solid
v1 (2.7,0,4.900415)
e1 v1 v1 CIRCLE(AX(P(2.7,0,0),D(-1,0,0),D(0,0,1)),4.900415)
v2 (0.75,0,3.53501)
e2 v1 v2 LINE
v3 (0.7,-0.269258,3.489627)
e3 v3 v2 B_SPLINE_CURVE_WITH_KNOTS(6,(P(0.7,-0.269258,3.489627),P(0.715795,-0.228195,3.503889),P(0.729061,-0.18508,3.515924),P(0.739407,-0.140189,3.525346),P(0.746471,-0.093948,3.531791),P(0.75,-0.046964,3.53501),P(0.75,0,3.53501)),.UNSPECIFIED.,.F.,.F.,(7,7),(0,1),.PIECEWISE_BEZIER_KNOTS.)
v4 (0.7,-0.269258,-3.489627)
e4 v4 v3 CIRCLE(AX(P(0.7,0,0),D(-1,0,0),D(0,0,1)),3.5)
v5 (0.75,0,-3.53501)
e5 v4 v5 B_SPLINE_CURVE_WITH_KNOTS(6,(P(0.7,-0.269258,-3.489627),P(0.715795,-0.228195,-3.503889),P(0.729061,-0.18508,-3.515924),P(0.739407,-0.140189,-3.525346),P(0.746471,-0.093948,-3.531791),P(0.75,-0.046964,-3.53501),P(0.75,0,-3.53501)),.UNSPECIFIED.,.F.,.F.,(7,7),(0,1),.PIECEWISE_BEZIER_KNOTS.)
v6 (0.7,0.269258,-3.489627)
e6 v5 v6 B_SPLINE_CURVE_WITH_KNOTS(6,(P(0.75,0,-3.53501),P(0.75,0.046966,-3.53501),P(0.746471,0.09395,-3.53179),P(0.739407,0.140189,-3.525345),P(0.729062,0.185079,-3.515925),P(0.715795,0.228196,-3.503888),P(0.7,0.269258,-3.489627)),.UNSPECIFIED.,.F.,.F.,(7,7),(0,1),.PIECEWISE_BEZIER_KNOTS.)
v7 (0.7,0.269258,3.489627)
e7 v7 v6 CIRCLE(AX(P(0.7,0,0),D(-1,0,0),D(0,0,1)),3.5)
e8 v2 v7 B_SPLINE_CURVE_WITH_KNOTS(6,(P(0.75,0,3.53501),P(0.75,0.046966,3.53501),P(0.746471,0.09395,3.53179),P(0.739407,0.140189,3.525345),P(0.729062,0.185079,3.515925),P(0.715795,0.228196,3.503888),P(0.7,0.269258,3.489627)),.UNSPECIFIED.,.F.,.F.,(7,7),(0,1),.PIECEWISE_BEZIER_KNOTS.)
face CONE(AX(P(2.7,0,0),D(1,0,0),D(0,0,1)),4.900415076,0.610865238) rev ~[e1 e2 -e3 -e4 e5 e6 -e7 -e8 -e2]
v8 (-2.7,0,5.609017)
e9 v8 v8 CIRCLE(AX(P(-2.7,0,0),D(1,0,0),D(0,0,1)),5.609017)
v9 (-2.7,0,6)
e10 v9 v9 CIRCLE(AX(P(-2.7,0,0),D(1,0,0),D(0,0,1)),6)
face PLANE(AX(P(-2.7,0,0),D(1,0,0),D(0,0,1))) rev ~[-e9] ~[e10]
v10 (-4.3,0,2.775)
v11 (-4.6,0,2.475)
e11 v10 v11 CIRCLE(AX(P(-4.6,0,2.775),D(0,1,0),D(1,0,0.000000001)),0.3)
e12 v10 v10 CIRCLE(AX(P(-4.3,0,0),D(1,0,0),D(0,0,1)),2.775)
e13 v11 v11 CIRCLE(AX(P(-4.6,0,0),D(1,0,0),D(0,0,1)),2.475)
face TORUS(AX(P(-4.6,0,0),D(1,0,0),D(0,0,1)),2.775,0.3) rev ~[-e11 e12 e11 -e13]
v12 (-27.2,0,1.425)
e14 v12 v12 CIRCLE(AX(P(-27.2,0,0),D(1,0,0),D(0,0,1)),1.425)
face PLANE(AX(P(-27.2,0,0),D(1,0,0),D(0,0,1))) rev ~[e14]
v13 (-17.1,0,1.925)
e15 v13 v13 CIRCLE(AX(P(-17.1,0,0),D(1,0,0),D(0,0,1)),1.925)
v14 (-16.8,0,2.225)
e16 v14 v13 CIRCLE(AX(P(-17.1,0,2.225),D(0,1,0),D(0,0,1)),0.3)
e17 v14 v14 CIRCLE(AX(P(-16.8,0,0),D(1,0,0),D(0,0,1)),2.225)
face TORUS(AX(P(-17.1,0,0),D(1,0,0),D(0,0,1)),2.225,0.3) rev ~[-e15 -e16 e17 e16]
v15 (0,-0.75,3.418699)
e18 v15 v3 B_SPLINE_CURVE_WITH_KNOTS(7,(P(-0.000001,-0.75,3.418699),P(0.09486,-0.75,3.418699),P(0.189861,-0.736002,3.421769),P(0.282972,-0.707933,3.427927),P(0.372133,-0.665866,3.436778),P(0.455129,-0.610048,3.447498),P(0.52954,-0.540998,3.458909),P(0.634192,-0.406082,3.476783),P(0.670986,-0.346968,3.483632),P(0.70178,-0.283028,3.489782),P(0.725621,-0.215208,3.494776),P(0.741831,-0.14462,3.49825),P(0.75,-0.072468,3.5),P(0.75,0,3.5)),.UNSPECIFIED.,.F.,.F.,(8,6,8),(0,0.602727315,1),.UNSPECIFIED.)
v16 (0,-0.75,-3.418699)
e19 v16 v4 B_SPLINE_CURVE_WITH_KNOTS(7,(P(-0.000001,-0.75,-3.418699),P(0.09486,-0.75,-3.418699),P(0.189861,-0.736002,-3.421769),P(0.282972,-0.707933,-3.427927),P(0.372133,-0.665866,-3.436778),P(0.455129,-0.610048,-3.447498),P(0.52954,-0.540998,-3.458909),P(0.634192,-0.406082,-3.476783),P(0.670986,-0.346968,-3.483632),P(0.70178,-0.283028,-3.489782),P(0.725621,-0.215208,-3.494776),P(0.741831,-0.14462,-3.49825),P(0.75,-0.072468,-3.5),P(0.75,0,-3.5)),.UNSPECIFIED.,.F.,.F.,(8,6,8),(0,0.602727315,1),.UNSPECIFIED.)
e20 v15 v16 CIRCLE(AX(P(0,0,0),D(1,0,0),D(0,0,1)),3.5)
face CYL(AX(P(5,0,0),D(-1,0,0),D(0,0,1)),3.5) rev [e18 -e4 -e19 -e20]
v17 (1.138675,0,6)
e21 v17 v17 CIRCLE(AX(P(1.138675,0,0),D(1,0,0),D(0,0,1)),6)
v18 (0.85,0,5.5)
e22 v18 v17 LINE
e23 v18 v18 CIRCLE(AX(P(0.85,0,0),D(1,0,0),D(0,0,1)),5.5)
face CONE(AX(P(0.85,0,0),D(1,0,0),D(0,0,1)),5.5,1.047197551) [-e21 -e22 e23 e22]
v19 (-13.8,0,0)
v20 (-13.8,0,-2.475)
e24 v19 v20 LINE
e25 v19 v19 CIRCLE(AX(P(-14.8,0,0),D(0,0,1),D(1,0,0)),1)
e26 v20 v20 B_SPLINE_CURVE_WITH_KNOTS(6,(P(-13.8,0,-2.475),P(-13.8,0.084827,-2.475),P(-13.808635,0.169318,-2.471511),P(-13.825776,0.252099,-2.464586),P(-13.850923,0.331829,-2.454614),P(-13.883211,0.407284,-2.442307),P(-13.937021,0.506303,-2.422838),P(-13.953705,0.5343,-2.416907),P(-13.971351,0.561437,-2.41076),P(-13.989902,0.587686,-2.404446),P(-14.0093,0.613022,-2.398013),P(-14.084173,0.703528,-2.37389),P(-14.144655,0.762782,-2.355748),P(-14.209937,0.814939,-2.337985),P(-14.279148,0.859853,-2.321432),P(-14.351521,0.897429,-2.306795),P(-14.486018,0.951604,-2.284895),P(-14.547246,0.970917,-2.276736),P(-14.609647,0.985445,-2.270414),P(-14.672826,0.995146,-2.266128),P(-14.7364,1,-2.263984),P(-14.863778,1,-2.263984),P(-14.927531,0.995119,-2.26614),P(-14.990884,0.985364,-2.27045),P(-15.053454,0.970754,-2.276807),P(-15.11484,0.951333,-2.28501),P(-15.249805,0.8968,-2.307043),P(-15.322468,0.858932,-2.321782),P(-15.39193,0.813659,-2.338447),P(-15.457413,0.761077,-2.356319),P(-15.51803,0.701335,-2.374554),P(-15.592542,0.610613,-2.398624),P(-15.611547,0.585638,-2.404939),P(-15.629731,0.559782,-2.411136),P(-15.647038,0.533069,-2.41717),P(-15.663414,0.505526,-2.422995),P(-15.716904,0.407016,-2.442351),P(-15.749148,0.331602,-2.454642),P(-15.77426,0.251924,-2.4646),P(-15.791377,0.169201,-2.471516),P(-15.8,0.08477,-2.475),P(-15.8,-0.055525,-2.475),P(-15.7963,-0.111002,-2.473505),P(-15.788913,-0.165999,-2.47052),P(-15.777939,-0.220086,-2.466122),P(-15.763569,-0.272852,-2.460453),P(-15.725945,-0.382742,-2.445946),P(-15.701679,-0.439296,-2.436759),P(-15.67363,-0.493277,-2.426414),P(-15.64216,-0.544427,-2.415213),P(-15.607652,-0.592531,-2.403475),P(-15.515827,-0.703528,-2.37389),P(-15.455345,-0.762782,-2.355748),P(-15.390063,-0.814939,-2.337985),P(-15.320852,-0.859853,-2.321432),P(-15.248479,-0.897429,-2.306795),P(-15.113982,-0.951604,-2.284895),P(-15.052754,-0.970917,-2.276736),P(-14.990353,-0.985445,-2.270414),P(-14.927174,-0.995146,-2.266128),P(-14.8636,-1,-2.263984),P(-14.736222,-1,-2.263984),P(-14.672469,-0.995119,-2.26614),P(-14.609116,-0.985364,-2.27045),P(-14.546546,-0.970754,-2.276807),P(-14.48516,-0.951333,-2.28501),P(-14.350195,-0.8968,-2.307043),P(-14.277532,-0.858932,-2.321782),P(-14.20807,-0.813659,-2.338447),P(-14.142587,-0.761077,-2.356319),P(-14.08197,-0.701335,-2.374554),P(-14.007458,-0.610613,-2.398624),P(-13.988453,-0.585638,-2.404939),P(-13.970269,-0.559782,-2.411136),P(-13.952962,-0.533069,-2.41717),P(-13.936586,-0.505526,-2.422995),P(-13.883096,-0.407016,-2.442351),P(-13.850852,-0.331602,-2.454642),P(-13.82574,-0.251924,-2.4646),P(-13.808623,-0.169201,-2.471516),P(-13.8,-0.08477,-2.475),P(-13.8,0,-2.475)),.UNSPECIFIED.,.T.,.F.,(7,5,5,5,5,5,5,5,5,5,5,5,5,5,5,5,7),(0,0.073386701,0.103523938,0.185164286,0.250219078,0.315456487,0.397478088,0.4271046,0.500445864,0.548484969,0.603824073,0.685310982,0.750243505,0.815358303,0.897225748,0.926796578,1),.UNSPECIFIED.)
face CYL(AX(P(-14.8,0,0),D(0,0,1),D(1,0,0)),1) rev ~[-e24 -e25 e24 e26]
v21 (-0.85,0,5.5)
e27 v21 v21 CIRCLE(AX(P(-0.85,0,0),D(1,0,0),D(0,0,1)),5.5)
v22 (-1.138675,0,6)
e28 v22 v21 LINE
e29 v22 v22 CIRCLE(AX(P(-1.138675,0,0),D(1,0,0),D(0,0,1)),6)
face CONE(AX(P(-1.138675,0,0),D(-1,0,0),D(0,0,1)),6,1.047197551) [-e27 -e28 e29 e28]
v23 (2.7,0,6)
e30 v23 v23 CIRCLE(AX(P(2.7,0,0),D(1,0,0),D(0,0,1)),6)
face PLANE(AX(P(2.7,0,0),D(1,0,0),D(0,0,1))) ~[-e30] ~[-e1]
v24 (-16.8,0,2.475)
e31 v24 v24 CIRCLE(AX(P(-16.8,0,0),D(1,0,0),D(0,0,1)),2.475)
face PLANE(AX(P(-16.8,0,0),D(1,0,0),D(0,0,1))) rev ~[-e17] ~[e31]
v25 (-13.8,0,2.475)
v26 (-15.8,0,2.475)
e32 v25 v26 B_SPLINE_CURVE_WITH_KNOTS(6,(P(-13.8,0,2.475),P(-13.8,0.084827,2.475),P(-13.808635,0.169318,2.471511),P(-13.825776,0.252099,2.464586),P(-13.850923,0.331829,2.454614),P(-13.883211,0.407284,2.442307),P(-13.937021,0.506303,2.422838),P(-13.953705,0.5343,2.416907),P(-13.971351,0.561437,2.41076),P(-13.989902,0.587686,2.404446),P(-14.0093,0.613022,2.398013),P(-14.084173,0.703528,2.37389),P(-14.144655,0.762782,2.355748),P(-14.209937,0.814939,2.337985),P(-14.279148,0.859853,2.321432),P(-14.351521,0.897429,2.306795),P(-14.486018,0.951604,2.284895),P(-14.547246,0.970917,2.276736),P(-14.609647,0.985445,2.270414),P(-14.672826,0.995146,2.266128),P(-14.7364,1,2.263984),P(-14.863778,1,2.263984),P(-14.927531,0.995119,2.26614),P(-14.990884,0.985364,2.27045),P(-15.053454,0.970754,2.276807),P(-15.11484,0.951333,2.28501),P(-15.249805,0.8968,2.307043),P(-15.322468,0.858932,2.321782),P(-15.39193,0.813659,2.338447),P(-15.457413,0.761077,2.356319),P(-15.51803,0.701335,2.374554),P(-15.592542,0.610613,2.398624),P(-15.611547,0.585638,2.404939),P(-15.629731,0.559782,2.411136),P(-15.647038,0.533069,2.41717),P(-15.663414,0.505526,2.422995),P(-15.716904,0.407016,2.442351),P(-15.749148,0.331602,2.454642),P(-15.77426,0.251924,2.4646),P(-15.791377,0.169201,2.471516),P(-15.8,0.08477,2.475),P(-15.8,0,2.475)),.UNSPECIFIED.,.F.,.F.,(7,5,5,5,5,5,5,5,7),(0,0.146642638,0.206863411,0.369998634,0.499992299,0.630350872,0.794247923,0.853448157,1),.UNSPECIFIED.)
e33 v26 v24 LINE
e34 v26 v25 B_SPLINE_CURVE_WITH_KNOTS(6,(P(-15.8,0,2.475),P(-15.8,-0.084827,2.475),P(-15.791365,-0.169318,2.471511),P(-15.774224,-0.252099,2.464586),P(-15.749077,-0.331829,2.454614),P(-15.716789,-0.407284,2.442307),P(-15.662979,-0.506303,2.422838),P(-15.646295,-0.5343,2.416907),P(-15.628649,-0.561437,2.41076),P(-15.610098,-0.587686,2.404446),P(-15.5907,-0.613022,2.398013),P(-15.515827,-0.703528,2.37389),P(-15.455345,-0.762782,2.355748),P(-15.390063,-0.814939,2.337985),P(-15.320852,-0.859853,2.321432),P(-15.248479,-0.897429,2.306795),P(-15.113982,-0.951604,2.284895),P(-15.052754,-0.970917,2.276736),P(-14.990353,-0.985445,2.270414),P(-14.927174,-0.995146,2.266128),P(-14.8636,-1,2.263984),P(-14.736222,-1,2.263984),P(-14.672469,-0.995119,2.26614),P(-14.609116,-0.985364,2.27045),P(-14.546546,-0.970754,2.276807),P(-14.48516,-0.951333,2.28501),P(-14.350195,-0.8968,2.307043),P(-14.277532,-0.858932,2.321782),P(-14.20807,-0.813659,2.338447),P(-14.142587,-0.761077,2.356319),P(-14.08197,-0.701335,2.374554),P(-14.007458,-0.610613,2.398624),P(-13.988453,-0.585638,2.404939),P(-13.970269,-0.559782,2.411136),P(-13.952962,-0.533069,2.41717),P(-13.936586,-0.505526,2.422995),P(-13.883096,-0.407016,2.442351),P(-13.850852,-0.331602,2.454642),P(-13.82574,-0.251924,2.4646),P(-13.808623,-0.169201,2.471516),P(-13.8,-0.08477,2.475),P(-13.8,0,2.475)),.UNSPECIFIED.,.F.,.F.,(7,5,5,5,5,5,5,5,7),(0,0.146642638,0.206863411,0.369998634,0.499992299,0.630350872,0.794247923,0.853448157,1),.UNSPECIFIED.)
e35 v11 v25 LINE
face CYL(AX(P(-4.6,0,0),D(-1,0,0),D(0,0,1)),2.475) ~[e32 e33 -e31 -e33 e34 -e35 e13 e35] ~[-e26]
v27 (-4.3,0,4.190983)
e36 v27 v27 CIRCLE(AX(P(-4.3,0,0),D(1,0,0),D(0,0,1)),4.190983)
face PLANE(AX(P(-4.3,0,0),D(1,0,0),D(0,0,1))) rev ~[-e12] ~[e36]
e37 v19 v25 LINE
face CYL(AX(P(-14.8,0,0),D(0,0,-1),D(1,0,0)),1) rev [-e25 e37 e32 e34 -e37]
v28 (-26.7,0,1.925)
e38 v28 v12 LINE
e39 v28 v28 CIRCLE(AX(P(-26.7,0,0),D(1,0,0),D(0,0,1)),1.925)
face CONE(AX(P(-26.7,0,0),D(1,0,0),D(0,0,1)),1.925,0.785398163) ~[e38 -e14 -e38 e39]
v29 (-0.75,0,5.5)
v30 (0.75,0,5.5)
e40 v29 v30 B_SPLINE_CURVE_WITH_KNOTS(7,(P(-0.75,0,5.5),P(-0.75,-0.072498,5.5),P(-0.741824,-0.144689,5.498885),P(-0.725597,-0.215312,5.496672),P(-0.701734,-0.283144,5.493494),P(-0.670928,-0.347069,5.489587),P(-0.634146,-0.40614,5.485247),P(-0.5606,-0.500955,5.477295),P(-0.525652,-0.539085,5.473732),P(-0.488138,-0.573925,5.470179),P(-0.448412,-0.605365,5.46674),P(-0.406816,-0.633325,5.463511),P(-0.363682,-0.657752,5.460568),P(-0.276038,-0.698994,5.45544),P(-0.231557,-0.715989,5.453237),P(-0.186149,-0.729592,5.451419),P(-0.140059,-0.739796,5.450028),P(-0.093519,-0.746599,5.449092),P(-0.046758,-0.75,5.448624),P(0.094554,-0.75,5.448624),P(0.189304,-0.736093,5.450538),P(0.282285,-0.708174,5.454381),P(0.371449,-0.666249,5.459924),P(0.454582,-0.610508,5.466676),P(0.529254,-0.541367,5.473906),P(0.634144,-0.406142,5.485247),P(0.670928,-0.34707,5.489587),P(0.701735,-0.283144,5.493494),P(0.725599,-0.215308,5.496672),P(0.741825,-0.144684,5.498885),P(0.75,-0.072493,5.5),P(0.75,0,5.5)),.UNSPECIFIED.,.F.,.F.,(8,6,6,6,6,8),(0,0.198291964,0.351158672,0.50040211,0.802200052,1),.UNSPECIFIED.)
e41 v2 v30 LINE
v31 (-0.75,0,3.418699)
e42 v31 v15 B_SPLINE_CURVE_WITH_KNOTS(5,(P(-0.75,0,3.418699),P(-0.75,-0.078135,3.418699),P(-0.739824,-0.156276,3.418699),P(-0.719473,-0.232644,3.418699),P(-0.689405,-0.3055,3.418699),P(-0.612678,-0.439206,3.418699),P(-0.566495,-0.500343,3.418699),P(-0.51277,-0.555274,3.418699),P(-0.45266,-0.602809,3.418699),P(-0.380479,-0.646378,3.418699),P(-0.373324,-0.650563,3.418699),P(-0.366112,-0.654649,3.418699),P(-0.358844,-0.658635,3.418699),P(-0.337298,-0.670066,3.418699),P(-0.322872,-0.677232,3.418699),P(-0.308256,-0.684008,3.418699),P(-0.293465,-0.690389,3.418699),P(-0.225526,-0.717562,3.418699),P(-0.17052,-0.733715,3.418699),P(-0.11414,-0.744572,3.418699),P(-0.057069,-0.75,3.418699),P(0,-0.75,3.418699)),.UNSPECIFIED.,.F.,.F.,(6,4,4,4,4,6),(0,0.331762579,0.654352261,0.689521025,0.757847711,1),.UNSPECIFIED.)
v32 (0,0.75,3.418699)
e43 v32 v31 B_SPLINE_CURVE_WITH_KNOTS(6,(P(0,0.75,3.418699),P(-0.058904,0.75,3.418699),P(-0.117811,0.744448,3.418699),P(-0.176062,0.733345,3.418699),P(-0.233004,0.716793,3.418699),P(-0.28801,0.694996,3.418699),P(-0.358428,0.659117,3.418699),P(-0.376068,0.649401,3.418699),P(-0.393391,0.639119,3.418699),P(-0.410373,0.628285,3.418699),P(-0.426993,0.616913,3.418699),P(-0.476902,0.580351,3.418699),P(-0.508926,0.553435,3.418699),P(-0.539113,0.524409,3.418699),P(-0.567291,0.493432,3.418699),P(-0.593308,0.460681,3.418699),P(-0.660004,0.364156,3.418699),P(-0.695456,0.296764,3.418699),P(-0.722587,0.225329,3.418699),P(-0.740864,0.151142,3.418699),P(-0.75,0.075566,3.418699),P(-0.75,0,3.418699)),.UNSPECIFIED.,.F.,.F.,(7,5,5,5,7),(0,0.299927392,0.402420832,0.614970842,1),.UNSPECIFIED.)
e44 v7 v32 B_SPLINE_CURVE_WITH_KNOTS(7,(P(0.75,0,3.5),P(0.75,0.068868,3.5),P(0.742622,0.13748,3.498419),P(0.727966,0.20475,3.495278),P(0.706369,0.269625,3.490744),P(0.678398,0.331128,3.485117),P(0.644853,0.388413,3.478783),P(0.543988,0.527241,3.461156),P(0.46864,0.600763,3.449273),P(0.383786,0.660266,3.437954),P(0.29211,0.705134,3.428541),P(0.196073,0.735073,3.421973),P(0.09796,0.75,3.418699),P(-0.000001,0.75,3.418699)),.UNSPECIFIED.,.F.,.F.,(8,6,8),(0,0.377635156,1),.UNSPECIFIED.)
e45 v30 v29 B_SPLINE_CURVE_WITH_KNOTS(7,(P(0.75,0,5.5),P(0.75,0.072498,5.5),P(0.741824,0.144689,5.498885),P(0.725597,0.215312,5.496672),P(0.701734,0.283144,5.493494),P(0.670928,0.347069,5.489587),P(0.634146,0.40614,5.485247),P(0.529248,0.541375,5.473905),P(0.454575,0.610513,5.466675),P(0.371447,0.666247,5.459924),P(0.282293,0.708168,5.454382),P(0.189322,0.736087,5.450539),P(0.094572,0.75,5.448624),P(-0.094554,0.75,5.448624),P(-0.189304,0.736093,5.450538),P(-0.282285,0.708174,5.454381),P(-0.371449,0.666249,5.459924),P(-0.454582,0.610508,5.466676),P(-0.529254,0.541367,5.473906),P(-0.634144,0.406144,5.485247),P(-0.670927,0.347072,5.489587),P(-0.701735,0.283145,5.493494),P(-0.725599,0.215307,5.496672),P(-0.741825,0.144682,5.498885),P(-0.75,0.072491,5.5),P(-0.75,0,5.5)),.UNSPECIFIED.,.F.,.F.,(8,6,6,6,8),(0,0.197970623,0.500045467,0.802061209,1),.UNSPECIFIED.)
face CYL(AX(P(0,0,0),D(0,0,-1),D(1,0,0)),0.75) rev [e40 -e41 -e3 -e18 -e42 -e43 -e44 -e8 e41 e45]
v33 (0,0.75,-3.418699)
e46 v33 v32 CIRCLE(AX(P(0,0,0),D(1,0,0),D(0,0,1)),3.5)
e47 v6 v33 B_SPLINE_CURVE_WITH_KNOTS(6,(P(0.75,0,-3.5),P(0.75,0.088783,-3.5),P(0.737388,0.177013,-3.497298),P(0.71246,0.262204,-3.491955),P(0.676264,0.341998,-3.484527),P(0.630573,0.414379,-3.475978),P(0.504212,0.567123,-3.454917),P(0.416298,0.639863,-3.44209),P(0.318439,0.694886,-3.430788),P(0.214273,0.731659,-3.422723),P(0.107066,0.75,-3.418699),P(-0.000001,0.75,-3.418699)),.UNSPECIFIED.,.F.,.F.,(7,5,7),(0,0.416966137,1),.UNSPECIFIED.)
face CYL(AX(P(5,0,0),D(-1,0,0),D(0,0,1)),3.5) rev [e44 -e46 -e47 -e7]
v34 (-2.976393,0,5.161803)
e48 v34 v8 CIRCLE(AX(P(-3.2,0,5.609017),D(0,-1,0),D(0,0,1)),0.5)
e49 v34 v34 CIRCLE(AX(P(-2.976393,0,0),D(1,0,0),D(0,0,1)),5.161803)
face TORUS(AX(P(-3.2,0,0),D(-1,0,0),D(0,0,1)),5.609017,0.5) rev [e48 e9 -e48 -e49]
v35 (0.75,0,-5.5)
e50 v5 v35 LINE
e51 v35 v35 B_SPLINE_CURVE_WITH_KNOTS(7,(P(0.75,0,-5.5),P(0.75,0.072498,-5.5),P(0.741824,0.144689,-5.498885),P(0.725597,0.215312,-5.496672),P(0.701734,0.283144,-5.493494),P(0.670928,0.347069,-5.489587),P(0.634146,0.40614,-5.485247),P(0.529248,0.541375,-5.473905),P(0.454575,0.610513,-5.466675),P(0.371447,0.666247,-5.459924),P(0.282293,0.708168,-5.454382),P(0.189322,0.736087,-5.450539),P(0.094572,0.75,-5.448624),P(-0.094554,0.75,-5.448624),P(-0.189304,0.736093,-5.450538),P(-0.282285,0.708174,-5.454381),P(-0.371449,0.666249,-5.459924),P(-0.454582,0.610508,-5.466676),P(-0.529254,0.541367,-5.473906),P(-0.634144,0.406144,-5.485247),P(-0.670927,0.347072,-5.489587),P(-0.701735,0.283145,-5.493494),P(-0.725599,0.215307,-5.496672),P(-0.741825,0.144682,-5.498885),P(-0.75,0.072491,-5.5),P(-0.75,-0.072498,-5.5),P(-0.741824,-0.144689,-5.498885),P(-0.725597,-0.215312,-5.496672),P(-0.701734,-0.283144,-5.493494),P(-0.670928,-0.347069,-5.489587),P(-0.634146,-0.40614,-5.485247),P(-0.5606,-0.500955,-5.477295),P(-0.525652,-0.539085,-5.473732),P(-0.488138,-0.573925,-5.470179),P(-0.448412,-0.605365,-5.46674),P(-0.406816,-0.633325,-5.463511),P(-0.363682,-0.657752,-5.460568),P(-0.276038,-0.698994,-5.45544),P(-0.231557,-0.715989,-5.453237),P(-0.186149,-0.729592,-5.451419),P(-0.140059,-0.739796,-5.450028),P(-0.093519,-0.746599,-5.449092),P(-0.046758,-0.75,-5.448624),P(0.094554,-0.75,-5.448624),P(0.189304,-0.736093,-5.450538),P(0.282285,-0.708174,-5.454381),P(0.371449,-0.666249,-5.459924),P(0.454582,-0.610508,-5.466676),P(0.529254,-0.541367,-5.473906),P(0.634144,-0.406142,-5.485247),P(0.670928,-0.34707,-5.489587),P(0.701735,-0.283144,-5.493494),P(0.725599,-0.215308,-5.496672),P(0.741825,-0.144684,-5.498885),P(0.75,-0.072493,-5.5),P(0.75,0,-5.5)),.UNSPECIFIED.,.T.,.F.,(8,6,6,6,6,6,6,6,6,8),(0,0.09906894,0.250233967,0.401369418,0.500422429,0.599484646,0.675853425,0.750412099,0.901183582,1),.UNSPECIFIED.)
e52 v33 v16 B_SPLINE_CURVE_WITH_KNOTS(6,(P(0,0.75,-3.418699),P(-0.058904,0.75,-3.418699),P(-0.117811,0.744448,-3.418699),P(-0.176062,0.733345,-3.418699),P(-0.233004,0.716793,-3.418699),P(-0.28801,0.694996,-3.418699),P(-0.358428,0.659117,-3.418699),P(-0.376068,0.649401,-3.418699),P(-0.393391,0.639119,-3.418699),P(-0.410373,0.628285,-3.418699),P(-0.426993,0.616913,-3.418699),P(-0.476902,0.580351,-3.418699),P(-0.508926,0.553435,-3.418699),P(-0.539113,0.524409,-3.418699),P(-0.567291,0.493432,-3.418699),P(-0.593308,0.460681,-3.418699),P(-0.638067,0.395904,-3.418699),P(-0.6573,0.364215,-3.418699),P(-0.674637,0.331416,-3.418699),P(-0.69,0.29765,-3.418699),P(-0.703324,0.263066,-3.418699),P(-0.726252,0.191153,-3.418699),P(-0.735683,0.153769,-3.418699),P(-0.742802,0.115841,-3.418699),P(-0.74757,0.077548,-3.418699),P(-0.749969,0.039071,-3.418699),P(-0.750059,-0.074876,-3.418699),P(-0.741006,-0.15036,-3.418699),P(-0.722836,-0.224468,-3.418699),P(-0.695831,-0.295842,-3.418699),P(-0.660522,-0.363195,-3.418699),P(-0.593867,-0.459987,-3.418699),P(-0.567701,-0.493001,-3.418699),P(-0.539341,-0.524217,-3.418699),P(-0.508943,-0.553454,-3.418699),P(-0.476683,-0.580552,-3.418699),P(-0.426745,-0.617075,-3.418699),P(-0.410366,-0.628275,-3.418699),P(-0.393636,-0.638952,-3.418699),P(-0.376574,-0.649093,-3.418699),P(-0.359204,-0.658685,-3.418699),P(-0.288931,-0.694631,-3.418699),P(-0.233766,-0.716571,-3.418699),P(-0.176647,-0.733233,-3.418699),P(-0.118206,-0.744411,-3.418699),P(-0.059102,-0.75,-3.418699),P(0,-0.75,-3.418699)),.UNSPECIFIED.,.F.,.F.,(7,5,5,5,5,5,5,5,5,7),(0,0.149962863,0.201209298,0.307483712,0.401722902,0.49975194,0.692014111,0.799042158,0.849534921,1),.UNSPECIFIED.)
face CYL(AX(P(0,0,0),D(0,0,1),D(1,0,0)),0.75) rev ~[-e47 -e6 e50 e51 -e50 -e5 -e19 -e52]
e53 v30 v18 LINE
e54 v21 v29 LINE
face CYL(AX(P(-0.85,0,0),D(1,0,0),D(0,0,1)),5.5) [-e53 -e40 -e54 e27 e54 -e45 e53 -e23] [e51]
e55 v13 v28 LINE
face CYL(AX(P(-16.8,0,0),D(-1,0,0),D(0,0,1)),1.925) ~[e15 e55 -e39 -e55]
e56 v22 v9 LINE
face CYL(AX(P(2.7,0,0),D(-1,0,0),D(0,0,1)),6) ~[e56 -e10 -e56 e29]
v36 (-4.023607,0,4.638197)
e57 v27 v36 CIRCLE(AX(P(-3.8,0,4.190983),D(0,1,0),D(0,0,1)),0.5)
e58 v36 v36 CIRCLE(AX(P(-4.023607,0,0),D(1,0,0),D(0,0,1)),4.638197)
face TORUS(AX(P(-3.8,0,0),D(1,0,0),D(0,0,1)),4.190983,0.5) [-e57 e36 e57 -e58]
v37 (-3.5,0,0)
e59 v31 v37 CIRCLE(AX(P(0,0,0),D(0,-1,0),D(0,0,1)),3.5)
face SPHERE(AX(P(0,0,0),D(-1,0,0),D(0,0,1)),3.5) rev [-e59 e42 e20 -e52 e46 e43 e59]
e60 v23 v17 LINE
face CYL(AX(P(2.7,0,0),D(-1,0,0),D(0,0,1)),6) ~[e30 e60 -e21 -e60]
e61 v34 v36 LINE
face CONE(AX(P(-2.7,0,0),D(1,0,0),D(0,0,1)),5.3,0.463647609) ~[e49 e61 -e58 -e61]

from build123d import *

# Parameters (mm, degrees)
F8_R          = 0.75
F8_R_2        = 1
F9_DEPTH      = 6.001
F9_DEPTH_BACK = 6.001
F11_SIZE      = 0.5
F12_R         = 0.5
F13_R         = 0.3


# Not quite as in the source:
# - a fillet or chamfer that OpenCascade refuses, or shapes differently, is made with other operations: its cross-section is extruded or revolved along the edge and cut away or added


with BuildPart() as f4:
    # F3 (on Front) → F4 (revolve)
    with BuildSketch(Plane.XZ):
        with BuildLine():
            Line((2.7, 6), (-2.7, 6))
            Line((-2.7, 6), (-2.7, 5.3))
            Line((-2.7, 5.3), (-4.3, 4.5))
            Line((-4.3, 4.5), (-4.3, 2.775))
            ThreePointArc((-4.3, 2.775), (-4.3878679656, 2.5628679656), (-4.6, 2.475))
            Line((-4.6, 2.475), (-16.8, 2.475))
            Line((-16.8, 2.475), (-16.8, 1.925))
            Line((-16.8, 1.925), (-27.2, 1.925))
            Line((-27.2, 1.925), (-27.2, 0))
            Line((-27.2, 0), (2.7, 0))
            Line((2.7, 0), (2.7, 6))
        make_face()
    revolve(axis=Axis((0, 0, 0), (1, 0, 0)))

    # F2 (on Front) → F5 (revolve, cut)
    with BuildSketch(Plane.XZ):
        with BuildLine():
            Line((5, 3.5), (0, 3.5))
            ThreePointArc((0, 3.5), (-2.4748737342, 2.4748737342), (-3.5, 0))
            Line((-3.5, 0), (5, 0))
            Line((5, 0), (5, 3.5))
        make_face()
    revolve(axis=Axis((0, 0, 0), (1, 0, 0)), mode=Mode.SUBTRACT)

    # F6 (on Front) → F7 (revolve, cut)
    with BuildSketch(Plane.XZ):
        Polygon((1.1386751346, 6), (-1.1386751346, 6), (-0.85, 5.5), (0.85, 5.5), align=None)
    revolve(axis=Axis((0, 0, 0), (1, 0, 0)), mode=Mode.SUBTRACT)

    # F8 (on Top) → F9 (cut, two sides)
    with BuildSketch(Plane.XY) as f9_sk:
        Circle(F8_R)
        with Locations((-14.8, 0)):
            Circle(F8_R_2)
    extrude(amount=-F9_DEPTH, mode=Mode.SUBTRACT)
    extrude(f9_sk.sketch, amount=F9_DEPTH_BACK, mode=Mode.SUBTRACT)

    # F10: chamfer of 2 x 1.4004150764 on 1 edges, made by hand

    # F10_s1 → F10_t2 (revolve, cut)
    with BuildSketch(Plane.XZ):
        Polygon((2.7, 4.9004150764), (0.7, 3.5), (2.7, 3.5), align=None)
    revolve(axis=Axis((2.7, 0, 0), (-1, 0, 0)), mode=Mode.SUBTRACT)

    # F11
    f11_edges = [f4.edges().sort_by_distance(p)[0] for p in [
        (-27.2, 0, -1.925),
    ]]
    chamfer(f11_edges, length=F11_SIZE)

    # F12
    f12_edges = [f4.edges().sort_by_distance(p)[0] for p in [
        (-4.3, 0, -4.5),
        (-2.7, 0, -5.3),
    ]]
    fillet(f12_edges, radius=F12_R)

    # F13
    f13_edges = [f4.edges().sort_by_distance(p)[0] for p in [
        (-16.8, 0, -1.925),
    ]]
    fillet(f13_edges, radius=F13_R)


solid = f4.part
